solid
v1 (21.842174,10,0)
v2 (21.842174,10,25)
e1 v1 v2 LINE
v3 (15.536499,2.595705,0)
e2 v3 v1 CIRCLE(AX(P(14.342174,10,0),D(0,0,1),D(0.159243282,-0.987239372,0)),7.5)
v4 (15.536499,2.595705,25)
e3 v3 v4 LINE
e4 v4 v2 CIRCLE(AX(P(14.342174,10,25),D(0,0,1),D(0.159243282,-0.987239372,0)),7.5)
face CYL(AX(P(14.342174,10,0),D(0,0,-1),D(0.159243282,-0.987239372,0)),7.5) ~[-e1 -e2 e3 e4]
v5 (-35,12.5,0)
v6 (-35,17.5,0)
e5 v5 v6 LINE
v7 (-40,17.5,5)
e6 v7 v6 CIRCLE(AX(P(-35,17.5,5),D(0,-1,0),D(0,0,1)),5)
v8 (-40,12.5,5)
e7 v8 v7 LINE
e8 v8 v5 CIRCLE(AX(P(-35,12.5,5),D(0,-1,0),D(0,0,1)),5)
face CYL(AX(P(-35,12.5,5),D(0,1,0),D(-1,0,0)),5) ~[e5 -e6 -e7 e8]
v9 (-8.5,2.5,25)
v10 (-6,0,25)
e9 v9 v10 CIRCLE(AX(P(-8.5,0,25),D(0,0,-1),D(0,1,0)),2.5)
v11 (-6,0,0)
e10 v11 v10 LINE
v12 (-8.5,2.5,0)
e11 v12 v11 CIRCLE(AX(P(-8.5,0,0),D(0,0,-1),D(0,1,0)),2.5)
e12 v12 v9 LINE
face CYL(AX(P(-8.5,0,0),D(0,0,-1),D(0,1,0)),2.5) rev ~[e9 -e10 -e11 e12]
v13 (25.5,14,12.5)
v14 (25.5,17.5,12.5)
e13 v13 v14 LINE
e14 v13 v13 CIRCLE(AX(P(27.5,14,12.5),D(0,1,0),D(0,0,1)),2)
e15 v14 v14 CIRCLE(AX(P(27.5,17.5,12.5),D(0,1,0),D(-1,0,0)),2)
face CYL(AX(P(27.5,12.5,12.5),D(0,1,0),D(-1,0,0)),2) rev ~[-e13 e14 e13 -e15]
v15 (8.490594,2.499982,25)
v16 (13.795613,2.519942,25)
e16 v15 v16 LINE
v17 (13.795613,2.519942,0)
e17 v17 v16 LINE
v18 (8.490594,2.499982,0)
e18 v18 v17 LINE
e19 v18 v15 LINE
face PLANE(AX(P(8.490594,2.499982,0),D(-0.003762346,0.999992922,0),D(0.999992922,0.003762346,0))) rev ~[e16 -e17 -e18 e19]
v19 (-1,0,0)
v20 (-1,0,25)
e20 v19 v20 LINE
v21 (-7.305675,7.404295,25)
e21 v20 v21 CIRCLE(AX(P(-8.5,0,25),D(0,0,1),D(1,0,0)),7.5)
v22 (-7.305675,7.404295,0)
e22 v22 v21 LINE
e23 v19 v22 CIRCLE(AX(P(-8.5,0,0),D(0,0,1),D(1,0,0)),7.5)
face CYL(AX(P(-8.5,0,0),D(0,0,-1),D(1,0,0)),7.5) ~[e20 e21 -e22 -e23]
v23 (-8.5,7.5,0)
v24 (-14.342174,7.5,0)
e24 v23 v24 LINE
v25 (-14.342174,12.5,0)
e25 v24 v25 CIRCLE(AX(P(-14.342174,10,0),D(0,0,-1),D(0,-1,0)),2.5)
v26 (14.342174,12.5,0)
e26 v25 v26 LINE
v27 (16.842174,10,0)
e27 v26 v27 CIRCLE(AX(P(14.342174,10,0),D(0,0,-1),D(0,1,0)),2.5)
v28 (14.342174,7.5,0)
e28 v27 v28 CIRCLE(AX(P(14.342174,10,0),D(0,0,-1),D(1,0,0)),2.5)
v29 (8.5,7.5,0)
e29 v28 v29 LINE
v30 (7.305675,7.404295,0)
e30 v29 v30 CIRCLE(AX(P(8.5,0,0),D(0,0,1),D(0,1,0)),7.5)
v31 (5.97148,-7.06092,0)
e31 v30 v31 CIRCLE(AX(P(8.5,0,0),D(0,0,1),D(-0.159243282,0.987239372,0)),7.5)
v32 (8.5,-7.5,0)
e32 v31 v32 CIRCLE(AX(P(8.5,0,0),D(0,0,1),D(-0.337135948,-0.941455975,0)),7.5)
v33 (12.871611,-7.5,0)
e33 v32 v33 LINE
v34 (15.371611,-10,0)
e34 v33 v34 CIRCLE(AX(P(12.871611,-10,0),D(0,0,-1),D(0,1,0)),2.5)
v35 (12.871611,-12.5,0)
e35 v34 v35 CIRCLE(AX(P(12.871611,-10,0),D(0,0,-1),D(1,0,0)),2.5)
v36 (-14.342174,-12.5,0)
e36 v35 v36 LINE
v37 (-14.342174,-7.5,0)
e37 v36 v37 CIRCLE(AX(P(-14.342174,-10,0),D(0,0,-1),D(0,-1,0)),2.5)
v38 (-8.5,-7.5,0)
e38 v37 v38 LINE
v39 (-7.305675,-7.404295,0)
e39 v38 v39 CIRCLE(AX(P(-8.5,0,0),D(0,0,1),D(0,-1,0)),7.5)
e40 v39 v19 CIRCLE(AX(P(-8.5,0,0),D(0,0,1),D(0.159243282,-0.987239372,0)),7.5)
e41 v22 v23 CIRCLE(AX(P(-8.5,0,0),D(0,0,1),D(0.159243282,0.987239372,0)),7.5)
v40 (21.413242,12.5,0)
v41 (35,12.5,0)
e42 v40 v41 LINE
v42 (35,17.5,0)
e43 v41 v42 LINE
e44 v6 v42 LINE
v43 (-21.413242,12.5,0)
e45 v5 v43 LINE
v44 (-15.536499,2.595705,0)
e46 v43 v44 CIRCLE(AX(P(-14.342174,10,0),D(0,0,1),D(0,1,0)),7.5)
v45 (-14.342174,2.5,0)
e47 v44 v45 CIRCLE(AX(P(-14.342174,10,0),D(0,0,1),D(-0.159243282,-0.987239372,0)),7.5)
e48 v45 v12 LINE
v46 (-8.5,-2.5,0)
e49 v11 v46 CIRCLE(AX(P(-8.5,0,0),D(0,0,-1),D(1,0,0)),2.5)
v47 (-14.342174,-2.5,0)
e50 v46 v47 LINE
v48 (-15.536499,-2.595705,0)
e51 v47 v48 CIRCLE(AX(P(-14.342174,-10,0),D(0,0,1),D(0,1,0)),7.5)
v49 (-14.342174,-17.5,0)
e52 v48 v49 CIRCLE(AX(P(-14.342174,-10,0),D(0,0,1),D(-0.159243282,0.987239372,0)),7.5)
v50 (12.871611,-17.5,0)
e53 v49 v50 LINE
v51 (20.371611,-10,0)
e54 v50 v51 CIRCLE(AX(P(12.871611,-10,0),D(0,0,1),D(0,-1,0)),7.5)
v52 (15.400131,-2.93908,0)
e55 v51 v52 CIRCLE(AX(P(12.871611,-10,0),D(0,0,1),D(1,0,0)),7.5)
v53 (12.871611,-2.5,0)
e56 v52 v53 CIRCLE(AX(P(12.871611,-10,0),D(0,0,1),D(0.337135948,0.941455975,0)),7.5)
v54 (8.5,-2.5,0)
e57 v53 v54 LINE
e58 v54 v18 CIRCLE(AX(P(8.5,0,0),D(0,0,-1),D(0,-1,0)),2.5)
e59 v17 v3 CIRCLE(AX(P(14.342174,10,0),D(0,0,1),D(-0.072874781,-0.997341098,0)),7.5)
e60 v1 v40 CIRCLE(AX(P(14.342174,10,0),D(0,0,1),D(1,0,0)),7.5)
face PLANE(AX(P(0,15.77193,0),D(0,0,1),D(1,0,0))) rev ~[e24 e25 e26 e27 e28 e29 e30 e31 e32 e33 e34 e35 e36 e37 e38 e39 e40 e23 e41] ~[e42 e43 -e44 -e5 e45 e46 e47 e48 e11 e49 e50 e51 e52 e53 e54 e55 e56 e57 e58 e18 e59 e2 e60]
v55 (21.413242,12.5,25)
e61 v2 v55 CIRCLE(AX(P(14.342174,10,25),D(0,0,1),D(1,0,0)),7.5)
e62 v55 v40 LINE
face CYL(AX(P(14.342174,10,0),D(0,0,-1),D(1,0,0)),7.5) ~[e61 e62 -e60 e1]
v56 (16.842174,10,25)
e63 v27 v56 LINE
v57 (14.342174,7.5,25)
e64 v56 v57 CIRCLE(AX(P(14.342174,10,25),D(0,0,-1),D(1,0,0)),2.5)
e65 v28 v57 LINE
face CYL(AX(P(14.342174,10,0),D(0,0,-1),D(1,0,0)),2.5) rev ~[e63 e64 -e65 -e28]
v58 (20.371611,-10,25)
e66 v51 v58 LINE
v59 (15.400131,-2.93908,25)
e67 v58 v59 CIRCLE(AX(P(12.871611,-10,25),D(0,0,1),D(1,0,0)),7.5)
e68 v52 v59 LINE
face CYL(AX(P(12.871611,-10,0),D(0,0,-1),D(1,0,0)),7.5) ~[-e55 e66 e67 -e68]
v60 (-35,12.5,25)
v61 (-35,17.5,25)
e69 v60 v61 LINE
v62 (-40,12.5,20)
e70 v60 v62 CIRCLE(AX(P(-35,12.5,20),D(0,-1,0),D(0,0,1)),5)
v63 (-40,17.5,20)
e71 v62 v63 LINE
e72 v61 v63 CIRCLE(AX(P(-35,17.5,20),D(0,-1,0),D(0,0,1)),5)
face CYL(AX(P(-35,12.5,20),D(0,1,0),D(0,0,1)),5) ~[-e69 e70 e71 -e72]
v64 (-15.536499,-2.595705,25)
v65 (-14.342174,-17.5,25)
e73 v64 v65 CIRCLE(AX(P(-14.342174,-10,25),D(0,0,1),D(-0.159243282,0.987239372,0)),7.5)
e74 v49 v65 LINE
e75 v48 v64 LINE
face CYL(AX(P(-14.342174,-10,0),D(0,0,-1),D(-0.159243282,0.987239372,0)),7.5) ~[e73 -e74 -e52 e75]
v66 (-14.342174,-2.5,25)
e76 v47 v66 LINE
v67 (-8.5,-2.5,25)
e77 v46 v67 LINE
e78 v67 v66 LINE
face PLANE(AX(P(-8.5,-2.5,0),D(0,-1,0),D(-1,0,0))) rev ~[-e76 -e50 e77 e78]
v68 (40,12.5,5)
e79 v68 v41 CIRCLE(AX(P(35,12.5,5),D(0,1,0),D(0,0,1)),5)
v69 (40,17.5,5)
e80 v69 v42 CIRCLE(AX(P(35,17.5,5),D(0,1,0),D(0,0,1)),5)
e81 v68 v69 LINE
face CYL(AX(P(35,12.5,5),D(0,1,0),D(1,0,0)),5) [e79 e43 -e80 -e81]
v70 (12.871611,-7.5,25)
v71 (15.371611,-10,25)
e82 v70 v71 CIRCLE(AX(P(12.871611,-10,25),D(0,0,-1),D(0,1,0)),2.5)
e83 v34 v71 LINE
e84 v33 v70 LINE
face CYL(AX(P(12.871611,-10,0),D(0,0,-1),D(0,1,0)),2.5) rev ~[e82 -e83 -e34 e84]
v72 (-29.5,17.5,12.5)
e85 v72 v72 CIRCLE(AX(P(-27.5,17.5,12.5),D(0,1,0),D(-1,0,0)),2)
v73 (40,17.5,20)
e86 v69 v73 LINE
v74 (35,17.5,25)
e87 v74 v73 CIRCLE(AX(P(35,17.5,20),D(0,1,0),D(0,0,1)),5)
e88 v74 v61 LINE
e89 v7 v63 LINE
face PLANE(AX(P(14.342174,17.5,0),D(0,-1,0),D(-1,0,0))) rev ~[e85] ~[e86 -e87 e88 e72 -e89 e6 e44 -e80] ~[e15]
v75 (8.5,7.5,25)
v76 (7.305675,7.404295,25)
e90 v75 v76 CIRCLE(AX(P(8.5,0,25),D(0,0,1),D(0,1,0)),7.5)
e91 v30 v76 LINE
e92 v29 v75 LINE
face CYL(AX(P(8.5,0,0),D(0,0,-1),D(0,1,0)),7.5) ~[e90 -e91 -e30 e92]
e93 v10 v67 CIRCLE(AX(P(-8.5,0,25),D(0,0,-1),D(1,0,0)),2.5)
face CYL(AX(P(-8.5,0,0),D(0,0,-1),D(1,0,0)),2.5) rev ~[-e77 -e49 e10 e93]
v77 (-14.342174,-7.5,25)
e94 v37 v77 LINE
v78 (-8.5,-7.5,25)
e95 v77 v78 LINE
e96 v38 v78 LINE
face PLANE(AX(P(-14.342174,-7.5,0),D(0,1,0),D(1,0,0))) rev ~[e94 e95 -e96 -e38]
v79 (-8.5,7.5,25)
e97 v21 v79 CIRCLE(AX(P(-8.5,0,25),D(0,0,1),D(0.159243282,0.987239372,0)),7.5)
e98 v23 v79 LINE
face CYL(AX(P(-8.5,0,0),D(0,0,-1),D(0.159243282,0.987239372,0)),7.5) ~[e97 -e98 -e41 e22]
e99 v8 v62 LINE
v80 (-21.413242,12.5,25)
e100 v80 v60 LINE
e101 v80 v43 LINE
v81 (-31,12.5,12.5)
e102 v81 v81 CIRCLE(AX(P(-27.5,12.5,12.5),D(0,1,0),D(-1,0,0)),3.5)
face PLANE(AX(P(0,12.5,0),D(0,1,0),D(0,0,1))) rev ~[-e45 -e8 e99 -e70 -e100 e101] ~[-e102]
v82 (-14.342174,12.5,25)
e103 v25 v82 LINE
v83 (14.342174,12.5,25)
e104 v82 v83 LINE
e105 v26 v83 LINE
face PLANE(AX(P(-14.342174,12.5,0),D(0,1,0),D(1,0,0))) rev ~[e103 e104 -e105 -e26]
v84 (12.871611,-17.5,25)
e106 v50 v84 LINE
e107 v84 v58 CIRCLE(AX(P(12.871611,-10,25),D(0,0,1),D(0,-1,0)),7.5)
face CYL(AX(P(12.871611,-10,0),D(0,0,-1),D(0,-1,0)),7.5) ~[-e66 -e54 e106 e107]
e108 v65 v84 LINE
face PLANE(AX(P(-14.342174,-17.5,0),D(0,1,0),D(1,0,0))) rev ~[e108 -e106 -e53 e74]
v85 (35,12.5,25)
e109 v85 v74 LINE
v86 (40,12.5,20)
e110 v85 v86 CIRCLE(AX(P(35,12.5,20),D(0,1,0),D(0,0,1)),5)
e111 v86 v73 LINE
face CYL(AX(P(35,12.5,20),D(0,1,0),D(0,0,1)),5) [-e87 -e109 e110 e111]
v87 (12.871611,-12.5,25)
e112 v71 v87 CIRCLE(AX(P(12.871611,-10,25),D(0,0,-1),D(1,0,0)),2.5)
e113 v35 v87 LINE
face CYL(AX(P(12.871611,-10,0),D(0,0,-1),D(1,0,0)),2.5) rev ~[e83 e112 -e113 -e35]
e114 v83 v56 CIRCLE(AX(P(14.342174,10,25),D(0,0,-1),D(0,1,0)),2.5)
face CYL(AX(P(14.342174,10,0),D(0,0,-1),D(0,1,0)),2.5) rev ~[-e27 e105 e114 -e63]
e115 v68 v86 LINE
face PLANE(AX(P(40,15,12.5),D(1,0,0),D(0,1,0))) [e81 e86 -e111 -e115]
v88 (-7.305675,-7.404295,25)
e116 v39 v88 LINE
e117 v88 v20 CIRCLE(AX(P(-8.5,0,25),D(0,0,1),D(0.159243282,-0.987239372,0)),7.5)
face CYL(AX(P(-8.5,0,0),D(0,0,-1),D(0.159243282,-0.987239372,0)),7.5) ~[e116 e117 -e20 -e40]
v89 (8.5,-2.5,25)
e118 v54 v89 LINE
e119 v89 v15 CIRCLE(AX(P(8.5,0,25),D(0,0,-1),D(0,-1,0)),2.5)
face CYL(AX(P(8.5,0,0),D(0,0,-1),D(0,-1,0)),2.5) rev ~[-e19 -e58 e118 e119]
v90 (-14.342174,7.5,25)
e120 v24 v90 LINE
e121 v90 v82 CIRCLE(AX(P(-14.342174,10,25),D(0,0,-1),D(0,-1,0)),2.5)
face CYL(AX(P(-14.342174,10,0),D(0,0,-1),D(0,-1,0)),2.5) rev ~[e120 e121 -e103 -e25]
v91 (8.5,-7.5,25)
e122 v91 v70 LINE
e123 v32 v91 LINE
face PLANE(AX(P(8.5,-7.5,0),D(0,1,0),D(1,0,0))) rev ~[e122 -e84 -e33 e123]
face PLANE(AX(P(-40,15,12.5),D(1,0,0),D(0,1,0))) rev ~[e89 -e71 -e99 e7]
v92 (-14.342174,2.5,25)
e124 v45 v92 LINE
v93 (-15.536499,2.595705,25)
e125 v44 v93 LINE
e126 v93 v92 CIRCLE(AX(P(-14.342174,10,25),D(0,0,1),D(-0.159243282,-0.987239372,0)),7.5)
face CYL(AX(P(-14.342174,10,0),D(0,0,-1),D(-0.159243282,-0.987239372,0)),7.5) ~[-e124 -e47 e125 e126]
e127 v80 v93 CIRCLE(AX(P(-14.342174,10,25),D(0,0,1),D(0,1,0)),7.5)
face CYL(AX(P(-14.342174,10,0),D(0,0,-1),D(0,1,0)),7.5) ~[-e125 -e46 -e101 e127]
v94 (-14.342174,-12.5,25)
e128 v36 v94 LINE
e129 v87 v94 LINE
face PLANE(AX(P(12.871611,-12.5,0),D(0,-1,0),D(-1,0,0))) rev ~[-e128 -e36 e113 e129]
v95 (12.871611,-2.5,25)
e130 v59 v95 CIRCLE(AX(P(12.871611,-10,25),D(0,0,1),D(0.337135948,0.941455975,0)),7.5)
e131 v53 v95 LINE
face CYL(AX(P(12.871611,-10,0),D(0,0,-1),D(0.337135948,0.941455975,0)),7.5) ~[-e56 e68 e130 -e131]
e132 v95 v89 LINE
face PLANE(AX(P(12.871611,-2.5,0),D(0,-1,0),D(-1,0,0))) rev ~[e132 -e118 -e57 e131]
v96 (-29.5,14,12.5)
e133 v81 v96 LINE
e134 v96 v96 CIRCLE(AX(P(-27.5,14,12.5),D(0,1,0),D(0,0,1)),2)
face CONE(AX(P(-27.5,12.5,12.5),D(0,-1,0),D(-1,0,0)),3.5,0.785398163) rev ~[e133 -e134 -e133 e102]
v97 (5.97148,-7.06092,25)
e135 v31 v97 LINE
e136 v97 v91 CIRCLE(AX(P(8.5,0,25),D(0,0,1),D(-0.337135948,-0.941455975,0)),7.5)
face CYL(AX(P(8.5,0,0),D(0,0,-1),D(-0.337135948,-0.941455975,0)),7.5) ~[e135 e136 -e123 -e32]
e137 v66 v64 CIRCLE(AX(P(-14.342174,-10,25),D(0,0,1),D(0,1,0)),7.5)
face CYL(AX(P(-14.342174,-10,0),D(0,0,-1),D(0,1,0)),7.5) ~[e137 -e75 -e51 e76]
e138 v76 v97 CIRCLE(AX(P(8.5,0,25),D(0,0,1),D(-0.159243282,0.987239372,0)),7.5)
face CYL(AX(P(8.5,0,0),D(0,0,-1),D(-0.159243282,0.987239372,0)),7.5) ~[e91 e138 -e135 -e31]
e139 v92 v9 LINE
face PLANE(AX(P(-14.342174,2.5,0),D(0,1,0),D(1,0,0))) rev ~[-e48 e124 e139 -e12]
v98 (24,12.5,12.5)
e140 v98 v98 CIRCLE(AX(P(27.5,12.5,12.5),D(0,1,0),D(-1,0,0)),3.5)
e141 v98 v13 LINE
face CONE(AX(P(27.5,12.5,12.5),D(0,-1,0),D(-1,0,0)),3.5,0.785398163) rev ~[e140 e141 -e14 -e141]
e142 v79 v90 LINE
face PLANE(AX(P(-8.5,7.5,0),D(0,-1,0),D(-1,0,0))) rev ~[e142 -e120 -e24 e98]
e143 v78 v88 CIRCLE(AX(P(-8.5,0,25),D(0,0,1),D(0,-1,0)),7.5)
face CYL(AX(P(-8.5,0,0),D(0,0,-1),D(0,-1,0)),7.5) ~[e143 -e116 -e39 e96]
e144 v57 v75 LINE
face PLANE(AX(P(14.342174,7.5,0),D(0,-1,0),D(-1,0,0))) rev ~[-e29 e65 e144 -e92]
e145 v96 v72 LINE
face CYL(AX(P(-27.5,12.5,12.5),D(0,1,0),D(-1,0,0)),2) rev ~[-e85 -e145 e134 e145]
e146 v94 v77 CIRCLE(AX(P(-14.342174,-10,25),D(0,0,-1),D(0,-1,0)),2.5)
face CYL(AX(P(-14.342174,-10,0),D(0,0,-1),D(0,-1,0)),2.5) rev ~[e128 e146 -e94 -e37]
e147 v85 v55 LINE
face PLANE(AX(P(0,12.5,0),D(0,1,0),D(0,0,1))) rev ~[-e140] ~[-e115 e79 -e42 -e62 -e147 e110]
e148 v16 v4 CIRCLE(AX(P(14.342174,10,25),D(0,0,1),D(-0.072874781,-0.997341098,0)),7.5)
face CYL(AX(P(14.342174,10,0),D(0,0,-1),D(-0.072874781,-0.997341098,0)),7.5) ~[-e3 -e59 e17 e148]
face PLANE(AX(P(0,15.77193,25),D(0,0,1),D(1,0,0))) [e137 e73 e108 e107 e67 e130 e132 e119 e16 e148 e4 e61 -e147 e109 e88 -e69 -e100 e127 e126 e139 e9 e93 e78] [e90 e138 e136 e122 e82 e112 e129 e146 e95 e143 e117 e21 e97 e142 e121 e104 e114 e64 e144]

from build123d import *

# Parameters (mm, degrees)
F1_DEPTH       = 25
F2_W           = 5
F2_H           = 25
F3_DEPTH       = 40
F4_R           = 5
F6_D           = 4
F6_CSINK_D     = 7
F6_CSINK_ANGLE = 90


# Not quite as in the source:
# - a feature names something its author has since deleted; it is built from what else it names


with BuildPart() as f1:
    # F0 (on Top) → F1 (new body)
    with BuildSketch(Plane.XY):
        with BuildLine():
            ThreePointArc((-14.3421743065, 17.5), (-10.0120472875, 16.123724357), (-7.2711064946, 12.5))
            Line((-7.2711064946, 12.5), (7.2711064946, 12.5))
            ThreePointArc((7.2711064946, 12.5), (10.0120472875, 16.123724357), (14.3421743065, 17.5))
            Line((14.3421743065, 17.5), (-14.3421743065, 17.5))
        make_face()
        with BuildLine():
            ThreePointArc((-7.2711064946, -12.5), (-10.0120472875, -16.123724357), (-14.3421743065, -17.5))
            Line((-14.3421743065, -17.5), (12.8716113806, -17.5))
            ThreePointArc((12.8716113806, -17.5), (8.5414843617, -16.123724357), (5.8005435687, -12.5))
            Line((5.8005435687, -12.5), (-7.2711064946, -12.5))
        make_face()
        with BuildLine():
            ThreePointArc((14.3421743065, 17.5), (10.0120472875, 16.123724357), (7.2711064946, 12.5))
            Line((7.2711064946, 12.5), (14.3421743065, 12.5))
            ThreePointArc((14.3421743065, 12.5), (16.1099412594, 11.767766953), (16.8421743065, 10))
            ThreePointArc((16.8421743065, 10), (16.1099412594, 8.232233047), (14.3421743065, 7.5))
            Line((14.3421743065, 7.5), (8.5, 7.5))
            ThreePointArc((8.5, 7.5), (12.7884854356, 6.1529580422), (15.5364989199, 2.5957047116))
            ThreePointArc((15.5364989199, 2.5957047116), (20.052140795, 5.1372556412), (21.8421743065, 10))
            ThreePointArc((21.8421743065, 10), (19.6454751654, 15.3033008589), (14.3421743065, 17.5))
        make_face()
        with BuildLine():
            ThreePointArc((-14.3421743065, 7.5), (-16.8421743065, 10), (-14.3421743065, 12.5))
            Line((-14.3421743065, 12.5), (-7.2711064946, 12.5))
            ThreePointArc((-7.2711064946, 12.5), (-10.0120472875, 16.123724357), (-14.3421743065, 17.5))
            ThreePointArc((-14.3421743065, 17.5), (-21.8182098422, 10.5990765131), (-15.5364989199, 2.5957047116))
            ThreePointArc((-15.5364989199, 2.5957047116), (-12.7884854356, 6.1529580422), (-8.5, 7.5))
            Line((-8.5, 7.5), (-14.3421743065, 7.5))
        make_face()
        with BuildLine():
            ThreePointArc((-7.3056753865, 7.4042952884), (-7.9009234869, 7.4760355357), (-8.5, 7.5))
            ThreePointArc((-8.5, 7.5), (-12.7884854356, 6.1529580422), (-15.5364989199, 2.5957047116))
            ThreePointArc((-15.5364989199, 2.5957047116), (-14.9412508196, 2.5239644643), (-14.3421743065, 2.5))
            ThreePointArc((-14.3421743065, 2.5), (-10.0536888708, 3.8470419578), (-7.3056753865, 7.4042952884))
        make_face()
        with BuildLine():
            ThreePointArc((-1, 0), (-2.7900335114, 4.8627443588), (-7.3056753865, 7.4042952884))
            ThreePointArc((-7.3056753865, 7.4042952884), (-10.0536888708, 3.8470419578), (-14.3421743065, 2.5))
            Line((-14.3421743065, 2.5), (-8.5, 2.5))
            ThreePointArc((-8.5, 2.5), (-6.732233047, 1.767766953), (-6, 0))
            ThreePointArc((-6, 0), (-6.732233047, -1.767766953), (-8.5, -2.5))
            Line((-8.5, -2.5), (-14.3421743065, -2.5))
            ThreePointArc((-14.3421743065, -2.5), (-10.0536888708, -3.8470419578), (-7.3056753865, -7.4042952884))
            ThreePointArc((-7.3056753865, -7.4042952884), (-2.7900335114, -4.8627443588), (-1, 0))
        make_face()
        with BuildLine():
            ThreePointArc((-14.3421743065, -2.5), (-14.9412508196, -2.5239644643), (-15.5364989199, -2.5957047116))
            ThreePointArc((-15.5364989199, -2.5957047116), (-12.7884854356, -6.1529580422), (-8.5, -7.5))
            ThreePointArc((-8.5, -7.5), (-7.9009234869, -7.4760355357), (-7.3056753865, -7.4042952884))
            ThreePointArc((-7.3056753865, -7.4042952884), (-10.0536888708, -3.8470419578), (-14.3421743065, -2.5))
        make_face()
        with BuildLine():
            ThreePointArc((12.8716113806, -2.5), (8.7359797123, -3.7432795568), (5.9714803927, -7.0609198123))
            ThreePointArc((5.9714803927, -7.0609198123), (7.2168200812, -7.3894146789), (8.5, -7.5))
            ThreePointArc((8.5, -7.5), (12.6356316683, -6.2567204432), (15.4001309879, -2.9390801877))
            ThreePointArc((15.4001309879, -2.9390801877), (14.1547912994, -2.6105853211), (12.8716113806, -2.5))
        make_face()
        with BuildLine():
            ThreePointArc((8.5, 7.5), (7.9009234869, 7.4760355357), (7.3056753865, 7.4042952884))
            ThreePointArc((7.3056753865, 7.4042952884), (9.8321935715, 4.0074985381), (13.7956134511, 2.5199417628))
            ThreePointArc((13.7956134511, 2.5199417628), (14.6682639838, 2.5070923186), (15.5364989199, 2.5957047116))
            ThreePointArc((15.5364989199, 2.5957047116), (12.7884854356, 6.1529580422), (8.5, 7.5))
        make_face()
        with BuildLine():
            ThreePointArc((13.7956134511, 2.5199417628), (9.8321935715, 4.0074985381), (7.3056753865, 7.4042952884))
            ThreePointArc((7.3056753865, 7.4042952884), (1.0317000428, 0.6888365189), (5.9714803927, -7.0609198123))
            ThreePointArc((5.9714803927, -7.0609198123), (8.7359797123, -3.7432795568), (12.8716113806, -2.5))
            Line((12.8716113806, -2.5), (8.5, -2.5))
            ThreePointArc((8.5, -2.5), (6.0000044235, -0.0047029402), (8.4905941362, 2.4999823059))
            Line((8.4905941362, 2.4999823059), (13.7956134511, 2.5199417628))
        make_face()
        with BuildLine():
            ThreePointArc((-8.5, -7.5), (-12.7884854356, -6.1529580422), (-15.5364989199, -2.5957047116))
            ThreePointArc((-15.5364989199, -2.5957047116), (-21.8182098422, -10.5990765131), (-14.3421743065, -17.5))
            ThreePointArc((-14.3421743065, -17.5), (-10.0120472875, -16.123724357), (-7.2711064946, -12.5))
            Line((-7.2711064946, -12.5), (-14.3421743065, -12.5))
            ThreePointArc((-14.3421743065, -12.5), (-16.8421743065, -10), (-14.3421743065, -7.5))
            Line((-14.3421743065, -7.5), (-8.5, -7.5))
        make_face()
        with BuildLine():
            Line((12.8716113806, -12.5), (5.8005435687, -12.5))
            ThreePointArc((5.8005435687, -12.5), (8.5414843617, -16.123724357), (12.8716113806, -17.5))
            ThreePointArc((12.8716113806, -17.5), (18.1749122395, -15.3033008589), (20.3716113806, -10))
            ThreePointArc((20.3716113806, -10), (19.0040618311, -5.6822399936), (15.4001309879, -2.9390801877))
            ThreePointArc((15.4001309879, -2.9390801877), (12.6356316683, -6.2567204432), (8.5, -7.5))
            Line((8.5, -7.5), (12.8716113806, -7.5))
            ThreePointArc((12.8716113806, -7.5), (14.6393783336, -8.232233047), (15.3716113806, -10))
            ThreePointArc((15.3716113806, -10), (14.6393783336, -11.767766953), (12.8716113806, -12.5))
        make_face()
    extrude(amount=F1_DEPTH)

    # F2 (on Right) → F3 (join, symmetric)
    with BuildSketch(Plane.YZ):
        with Locations((15, 12.5)):
            Rectangle(F2_W, F2_H)
    extrude(amount=F3_DEPTH, both=True)

    # F4
    f4_edges = [f1.edges().sort_by_distance(p)[0] for p in [
        (40, 15, 0),
        (40, 15, 25),
        (-40, 15, 25),
        (-40, 15, 0),
    ]]
    fillet(f4_edges, radius=F4_R)

    # F6 (through all)
    with Locations(Plane.XZ.offset(-12.5)):
        with Locations((27.5, 12.5), (-27.5, 12.5)):
            CounterSinkHole(F6_D / 2, F6_CSINK_D / 2, counter_sink_angle=F6_CSINK_ANGLE)


solid = f1.part
